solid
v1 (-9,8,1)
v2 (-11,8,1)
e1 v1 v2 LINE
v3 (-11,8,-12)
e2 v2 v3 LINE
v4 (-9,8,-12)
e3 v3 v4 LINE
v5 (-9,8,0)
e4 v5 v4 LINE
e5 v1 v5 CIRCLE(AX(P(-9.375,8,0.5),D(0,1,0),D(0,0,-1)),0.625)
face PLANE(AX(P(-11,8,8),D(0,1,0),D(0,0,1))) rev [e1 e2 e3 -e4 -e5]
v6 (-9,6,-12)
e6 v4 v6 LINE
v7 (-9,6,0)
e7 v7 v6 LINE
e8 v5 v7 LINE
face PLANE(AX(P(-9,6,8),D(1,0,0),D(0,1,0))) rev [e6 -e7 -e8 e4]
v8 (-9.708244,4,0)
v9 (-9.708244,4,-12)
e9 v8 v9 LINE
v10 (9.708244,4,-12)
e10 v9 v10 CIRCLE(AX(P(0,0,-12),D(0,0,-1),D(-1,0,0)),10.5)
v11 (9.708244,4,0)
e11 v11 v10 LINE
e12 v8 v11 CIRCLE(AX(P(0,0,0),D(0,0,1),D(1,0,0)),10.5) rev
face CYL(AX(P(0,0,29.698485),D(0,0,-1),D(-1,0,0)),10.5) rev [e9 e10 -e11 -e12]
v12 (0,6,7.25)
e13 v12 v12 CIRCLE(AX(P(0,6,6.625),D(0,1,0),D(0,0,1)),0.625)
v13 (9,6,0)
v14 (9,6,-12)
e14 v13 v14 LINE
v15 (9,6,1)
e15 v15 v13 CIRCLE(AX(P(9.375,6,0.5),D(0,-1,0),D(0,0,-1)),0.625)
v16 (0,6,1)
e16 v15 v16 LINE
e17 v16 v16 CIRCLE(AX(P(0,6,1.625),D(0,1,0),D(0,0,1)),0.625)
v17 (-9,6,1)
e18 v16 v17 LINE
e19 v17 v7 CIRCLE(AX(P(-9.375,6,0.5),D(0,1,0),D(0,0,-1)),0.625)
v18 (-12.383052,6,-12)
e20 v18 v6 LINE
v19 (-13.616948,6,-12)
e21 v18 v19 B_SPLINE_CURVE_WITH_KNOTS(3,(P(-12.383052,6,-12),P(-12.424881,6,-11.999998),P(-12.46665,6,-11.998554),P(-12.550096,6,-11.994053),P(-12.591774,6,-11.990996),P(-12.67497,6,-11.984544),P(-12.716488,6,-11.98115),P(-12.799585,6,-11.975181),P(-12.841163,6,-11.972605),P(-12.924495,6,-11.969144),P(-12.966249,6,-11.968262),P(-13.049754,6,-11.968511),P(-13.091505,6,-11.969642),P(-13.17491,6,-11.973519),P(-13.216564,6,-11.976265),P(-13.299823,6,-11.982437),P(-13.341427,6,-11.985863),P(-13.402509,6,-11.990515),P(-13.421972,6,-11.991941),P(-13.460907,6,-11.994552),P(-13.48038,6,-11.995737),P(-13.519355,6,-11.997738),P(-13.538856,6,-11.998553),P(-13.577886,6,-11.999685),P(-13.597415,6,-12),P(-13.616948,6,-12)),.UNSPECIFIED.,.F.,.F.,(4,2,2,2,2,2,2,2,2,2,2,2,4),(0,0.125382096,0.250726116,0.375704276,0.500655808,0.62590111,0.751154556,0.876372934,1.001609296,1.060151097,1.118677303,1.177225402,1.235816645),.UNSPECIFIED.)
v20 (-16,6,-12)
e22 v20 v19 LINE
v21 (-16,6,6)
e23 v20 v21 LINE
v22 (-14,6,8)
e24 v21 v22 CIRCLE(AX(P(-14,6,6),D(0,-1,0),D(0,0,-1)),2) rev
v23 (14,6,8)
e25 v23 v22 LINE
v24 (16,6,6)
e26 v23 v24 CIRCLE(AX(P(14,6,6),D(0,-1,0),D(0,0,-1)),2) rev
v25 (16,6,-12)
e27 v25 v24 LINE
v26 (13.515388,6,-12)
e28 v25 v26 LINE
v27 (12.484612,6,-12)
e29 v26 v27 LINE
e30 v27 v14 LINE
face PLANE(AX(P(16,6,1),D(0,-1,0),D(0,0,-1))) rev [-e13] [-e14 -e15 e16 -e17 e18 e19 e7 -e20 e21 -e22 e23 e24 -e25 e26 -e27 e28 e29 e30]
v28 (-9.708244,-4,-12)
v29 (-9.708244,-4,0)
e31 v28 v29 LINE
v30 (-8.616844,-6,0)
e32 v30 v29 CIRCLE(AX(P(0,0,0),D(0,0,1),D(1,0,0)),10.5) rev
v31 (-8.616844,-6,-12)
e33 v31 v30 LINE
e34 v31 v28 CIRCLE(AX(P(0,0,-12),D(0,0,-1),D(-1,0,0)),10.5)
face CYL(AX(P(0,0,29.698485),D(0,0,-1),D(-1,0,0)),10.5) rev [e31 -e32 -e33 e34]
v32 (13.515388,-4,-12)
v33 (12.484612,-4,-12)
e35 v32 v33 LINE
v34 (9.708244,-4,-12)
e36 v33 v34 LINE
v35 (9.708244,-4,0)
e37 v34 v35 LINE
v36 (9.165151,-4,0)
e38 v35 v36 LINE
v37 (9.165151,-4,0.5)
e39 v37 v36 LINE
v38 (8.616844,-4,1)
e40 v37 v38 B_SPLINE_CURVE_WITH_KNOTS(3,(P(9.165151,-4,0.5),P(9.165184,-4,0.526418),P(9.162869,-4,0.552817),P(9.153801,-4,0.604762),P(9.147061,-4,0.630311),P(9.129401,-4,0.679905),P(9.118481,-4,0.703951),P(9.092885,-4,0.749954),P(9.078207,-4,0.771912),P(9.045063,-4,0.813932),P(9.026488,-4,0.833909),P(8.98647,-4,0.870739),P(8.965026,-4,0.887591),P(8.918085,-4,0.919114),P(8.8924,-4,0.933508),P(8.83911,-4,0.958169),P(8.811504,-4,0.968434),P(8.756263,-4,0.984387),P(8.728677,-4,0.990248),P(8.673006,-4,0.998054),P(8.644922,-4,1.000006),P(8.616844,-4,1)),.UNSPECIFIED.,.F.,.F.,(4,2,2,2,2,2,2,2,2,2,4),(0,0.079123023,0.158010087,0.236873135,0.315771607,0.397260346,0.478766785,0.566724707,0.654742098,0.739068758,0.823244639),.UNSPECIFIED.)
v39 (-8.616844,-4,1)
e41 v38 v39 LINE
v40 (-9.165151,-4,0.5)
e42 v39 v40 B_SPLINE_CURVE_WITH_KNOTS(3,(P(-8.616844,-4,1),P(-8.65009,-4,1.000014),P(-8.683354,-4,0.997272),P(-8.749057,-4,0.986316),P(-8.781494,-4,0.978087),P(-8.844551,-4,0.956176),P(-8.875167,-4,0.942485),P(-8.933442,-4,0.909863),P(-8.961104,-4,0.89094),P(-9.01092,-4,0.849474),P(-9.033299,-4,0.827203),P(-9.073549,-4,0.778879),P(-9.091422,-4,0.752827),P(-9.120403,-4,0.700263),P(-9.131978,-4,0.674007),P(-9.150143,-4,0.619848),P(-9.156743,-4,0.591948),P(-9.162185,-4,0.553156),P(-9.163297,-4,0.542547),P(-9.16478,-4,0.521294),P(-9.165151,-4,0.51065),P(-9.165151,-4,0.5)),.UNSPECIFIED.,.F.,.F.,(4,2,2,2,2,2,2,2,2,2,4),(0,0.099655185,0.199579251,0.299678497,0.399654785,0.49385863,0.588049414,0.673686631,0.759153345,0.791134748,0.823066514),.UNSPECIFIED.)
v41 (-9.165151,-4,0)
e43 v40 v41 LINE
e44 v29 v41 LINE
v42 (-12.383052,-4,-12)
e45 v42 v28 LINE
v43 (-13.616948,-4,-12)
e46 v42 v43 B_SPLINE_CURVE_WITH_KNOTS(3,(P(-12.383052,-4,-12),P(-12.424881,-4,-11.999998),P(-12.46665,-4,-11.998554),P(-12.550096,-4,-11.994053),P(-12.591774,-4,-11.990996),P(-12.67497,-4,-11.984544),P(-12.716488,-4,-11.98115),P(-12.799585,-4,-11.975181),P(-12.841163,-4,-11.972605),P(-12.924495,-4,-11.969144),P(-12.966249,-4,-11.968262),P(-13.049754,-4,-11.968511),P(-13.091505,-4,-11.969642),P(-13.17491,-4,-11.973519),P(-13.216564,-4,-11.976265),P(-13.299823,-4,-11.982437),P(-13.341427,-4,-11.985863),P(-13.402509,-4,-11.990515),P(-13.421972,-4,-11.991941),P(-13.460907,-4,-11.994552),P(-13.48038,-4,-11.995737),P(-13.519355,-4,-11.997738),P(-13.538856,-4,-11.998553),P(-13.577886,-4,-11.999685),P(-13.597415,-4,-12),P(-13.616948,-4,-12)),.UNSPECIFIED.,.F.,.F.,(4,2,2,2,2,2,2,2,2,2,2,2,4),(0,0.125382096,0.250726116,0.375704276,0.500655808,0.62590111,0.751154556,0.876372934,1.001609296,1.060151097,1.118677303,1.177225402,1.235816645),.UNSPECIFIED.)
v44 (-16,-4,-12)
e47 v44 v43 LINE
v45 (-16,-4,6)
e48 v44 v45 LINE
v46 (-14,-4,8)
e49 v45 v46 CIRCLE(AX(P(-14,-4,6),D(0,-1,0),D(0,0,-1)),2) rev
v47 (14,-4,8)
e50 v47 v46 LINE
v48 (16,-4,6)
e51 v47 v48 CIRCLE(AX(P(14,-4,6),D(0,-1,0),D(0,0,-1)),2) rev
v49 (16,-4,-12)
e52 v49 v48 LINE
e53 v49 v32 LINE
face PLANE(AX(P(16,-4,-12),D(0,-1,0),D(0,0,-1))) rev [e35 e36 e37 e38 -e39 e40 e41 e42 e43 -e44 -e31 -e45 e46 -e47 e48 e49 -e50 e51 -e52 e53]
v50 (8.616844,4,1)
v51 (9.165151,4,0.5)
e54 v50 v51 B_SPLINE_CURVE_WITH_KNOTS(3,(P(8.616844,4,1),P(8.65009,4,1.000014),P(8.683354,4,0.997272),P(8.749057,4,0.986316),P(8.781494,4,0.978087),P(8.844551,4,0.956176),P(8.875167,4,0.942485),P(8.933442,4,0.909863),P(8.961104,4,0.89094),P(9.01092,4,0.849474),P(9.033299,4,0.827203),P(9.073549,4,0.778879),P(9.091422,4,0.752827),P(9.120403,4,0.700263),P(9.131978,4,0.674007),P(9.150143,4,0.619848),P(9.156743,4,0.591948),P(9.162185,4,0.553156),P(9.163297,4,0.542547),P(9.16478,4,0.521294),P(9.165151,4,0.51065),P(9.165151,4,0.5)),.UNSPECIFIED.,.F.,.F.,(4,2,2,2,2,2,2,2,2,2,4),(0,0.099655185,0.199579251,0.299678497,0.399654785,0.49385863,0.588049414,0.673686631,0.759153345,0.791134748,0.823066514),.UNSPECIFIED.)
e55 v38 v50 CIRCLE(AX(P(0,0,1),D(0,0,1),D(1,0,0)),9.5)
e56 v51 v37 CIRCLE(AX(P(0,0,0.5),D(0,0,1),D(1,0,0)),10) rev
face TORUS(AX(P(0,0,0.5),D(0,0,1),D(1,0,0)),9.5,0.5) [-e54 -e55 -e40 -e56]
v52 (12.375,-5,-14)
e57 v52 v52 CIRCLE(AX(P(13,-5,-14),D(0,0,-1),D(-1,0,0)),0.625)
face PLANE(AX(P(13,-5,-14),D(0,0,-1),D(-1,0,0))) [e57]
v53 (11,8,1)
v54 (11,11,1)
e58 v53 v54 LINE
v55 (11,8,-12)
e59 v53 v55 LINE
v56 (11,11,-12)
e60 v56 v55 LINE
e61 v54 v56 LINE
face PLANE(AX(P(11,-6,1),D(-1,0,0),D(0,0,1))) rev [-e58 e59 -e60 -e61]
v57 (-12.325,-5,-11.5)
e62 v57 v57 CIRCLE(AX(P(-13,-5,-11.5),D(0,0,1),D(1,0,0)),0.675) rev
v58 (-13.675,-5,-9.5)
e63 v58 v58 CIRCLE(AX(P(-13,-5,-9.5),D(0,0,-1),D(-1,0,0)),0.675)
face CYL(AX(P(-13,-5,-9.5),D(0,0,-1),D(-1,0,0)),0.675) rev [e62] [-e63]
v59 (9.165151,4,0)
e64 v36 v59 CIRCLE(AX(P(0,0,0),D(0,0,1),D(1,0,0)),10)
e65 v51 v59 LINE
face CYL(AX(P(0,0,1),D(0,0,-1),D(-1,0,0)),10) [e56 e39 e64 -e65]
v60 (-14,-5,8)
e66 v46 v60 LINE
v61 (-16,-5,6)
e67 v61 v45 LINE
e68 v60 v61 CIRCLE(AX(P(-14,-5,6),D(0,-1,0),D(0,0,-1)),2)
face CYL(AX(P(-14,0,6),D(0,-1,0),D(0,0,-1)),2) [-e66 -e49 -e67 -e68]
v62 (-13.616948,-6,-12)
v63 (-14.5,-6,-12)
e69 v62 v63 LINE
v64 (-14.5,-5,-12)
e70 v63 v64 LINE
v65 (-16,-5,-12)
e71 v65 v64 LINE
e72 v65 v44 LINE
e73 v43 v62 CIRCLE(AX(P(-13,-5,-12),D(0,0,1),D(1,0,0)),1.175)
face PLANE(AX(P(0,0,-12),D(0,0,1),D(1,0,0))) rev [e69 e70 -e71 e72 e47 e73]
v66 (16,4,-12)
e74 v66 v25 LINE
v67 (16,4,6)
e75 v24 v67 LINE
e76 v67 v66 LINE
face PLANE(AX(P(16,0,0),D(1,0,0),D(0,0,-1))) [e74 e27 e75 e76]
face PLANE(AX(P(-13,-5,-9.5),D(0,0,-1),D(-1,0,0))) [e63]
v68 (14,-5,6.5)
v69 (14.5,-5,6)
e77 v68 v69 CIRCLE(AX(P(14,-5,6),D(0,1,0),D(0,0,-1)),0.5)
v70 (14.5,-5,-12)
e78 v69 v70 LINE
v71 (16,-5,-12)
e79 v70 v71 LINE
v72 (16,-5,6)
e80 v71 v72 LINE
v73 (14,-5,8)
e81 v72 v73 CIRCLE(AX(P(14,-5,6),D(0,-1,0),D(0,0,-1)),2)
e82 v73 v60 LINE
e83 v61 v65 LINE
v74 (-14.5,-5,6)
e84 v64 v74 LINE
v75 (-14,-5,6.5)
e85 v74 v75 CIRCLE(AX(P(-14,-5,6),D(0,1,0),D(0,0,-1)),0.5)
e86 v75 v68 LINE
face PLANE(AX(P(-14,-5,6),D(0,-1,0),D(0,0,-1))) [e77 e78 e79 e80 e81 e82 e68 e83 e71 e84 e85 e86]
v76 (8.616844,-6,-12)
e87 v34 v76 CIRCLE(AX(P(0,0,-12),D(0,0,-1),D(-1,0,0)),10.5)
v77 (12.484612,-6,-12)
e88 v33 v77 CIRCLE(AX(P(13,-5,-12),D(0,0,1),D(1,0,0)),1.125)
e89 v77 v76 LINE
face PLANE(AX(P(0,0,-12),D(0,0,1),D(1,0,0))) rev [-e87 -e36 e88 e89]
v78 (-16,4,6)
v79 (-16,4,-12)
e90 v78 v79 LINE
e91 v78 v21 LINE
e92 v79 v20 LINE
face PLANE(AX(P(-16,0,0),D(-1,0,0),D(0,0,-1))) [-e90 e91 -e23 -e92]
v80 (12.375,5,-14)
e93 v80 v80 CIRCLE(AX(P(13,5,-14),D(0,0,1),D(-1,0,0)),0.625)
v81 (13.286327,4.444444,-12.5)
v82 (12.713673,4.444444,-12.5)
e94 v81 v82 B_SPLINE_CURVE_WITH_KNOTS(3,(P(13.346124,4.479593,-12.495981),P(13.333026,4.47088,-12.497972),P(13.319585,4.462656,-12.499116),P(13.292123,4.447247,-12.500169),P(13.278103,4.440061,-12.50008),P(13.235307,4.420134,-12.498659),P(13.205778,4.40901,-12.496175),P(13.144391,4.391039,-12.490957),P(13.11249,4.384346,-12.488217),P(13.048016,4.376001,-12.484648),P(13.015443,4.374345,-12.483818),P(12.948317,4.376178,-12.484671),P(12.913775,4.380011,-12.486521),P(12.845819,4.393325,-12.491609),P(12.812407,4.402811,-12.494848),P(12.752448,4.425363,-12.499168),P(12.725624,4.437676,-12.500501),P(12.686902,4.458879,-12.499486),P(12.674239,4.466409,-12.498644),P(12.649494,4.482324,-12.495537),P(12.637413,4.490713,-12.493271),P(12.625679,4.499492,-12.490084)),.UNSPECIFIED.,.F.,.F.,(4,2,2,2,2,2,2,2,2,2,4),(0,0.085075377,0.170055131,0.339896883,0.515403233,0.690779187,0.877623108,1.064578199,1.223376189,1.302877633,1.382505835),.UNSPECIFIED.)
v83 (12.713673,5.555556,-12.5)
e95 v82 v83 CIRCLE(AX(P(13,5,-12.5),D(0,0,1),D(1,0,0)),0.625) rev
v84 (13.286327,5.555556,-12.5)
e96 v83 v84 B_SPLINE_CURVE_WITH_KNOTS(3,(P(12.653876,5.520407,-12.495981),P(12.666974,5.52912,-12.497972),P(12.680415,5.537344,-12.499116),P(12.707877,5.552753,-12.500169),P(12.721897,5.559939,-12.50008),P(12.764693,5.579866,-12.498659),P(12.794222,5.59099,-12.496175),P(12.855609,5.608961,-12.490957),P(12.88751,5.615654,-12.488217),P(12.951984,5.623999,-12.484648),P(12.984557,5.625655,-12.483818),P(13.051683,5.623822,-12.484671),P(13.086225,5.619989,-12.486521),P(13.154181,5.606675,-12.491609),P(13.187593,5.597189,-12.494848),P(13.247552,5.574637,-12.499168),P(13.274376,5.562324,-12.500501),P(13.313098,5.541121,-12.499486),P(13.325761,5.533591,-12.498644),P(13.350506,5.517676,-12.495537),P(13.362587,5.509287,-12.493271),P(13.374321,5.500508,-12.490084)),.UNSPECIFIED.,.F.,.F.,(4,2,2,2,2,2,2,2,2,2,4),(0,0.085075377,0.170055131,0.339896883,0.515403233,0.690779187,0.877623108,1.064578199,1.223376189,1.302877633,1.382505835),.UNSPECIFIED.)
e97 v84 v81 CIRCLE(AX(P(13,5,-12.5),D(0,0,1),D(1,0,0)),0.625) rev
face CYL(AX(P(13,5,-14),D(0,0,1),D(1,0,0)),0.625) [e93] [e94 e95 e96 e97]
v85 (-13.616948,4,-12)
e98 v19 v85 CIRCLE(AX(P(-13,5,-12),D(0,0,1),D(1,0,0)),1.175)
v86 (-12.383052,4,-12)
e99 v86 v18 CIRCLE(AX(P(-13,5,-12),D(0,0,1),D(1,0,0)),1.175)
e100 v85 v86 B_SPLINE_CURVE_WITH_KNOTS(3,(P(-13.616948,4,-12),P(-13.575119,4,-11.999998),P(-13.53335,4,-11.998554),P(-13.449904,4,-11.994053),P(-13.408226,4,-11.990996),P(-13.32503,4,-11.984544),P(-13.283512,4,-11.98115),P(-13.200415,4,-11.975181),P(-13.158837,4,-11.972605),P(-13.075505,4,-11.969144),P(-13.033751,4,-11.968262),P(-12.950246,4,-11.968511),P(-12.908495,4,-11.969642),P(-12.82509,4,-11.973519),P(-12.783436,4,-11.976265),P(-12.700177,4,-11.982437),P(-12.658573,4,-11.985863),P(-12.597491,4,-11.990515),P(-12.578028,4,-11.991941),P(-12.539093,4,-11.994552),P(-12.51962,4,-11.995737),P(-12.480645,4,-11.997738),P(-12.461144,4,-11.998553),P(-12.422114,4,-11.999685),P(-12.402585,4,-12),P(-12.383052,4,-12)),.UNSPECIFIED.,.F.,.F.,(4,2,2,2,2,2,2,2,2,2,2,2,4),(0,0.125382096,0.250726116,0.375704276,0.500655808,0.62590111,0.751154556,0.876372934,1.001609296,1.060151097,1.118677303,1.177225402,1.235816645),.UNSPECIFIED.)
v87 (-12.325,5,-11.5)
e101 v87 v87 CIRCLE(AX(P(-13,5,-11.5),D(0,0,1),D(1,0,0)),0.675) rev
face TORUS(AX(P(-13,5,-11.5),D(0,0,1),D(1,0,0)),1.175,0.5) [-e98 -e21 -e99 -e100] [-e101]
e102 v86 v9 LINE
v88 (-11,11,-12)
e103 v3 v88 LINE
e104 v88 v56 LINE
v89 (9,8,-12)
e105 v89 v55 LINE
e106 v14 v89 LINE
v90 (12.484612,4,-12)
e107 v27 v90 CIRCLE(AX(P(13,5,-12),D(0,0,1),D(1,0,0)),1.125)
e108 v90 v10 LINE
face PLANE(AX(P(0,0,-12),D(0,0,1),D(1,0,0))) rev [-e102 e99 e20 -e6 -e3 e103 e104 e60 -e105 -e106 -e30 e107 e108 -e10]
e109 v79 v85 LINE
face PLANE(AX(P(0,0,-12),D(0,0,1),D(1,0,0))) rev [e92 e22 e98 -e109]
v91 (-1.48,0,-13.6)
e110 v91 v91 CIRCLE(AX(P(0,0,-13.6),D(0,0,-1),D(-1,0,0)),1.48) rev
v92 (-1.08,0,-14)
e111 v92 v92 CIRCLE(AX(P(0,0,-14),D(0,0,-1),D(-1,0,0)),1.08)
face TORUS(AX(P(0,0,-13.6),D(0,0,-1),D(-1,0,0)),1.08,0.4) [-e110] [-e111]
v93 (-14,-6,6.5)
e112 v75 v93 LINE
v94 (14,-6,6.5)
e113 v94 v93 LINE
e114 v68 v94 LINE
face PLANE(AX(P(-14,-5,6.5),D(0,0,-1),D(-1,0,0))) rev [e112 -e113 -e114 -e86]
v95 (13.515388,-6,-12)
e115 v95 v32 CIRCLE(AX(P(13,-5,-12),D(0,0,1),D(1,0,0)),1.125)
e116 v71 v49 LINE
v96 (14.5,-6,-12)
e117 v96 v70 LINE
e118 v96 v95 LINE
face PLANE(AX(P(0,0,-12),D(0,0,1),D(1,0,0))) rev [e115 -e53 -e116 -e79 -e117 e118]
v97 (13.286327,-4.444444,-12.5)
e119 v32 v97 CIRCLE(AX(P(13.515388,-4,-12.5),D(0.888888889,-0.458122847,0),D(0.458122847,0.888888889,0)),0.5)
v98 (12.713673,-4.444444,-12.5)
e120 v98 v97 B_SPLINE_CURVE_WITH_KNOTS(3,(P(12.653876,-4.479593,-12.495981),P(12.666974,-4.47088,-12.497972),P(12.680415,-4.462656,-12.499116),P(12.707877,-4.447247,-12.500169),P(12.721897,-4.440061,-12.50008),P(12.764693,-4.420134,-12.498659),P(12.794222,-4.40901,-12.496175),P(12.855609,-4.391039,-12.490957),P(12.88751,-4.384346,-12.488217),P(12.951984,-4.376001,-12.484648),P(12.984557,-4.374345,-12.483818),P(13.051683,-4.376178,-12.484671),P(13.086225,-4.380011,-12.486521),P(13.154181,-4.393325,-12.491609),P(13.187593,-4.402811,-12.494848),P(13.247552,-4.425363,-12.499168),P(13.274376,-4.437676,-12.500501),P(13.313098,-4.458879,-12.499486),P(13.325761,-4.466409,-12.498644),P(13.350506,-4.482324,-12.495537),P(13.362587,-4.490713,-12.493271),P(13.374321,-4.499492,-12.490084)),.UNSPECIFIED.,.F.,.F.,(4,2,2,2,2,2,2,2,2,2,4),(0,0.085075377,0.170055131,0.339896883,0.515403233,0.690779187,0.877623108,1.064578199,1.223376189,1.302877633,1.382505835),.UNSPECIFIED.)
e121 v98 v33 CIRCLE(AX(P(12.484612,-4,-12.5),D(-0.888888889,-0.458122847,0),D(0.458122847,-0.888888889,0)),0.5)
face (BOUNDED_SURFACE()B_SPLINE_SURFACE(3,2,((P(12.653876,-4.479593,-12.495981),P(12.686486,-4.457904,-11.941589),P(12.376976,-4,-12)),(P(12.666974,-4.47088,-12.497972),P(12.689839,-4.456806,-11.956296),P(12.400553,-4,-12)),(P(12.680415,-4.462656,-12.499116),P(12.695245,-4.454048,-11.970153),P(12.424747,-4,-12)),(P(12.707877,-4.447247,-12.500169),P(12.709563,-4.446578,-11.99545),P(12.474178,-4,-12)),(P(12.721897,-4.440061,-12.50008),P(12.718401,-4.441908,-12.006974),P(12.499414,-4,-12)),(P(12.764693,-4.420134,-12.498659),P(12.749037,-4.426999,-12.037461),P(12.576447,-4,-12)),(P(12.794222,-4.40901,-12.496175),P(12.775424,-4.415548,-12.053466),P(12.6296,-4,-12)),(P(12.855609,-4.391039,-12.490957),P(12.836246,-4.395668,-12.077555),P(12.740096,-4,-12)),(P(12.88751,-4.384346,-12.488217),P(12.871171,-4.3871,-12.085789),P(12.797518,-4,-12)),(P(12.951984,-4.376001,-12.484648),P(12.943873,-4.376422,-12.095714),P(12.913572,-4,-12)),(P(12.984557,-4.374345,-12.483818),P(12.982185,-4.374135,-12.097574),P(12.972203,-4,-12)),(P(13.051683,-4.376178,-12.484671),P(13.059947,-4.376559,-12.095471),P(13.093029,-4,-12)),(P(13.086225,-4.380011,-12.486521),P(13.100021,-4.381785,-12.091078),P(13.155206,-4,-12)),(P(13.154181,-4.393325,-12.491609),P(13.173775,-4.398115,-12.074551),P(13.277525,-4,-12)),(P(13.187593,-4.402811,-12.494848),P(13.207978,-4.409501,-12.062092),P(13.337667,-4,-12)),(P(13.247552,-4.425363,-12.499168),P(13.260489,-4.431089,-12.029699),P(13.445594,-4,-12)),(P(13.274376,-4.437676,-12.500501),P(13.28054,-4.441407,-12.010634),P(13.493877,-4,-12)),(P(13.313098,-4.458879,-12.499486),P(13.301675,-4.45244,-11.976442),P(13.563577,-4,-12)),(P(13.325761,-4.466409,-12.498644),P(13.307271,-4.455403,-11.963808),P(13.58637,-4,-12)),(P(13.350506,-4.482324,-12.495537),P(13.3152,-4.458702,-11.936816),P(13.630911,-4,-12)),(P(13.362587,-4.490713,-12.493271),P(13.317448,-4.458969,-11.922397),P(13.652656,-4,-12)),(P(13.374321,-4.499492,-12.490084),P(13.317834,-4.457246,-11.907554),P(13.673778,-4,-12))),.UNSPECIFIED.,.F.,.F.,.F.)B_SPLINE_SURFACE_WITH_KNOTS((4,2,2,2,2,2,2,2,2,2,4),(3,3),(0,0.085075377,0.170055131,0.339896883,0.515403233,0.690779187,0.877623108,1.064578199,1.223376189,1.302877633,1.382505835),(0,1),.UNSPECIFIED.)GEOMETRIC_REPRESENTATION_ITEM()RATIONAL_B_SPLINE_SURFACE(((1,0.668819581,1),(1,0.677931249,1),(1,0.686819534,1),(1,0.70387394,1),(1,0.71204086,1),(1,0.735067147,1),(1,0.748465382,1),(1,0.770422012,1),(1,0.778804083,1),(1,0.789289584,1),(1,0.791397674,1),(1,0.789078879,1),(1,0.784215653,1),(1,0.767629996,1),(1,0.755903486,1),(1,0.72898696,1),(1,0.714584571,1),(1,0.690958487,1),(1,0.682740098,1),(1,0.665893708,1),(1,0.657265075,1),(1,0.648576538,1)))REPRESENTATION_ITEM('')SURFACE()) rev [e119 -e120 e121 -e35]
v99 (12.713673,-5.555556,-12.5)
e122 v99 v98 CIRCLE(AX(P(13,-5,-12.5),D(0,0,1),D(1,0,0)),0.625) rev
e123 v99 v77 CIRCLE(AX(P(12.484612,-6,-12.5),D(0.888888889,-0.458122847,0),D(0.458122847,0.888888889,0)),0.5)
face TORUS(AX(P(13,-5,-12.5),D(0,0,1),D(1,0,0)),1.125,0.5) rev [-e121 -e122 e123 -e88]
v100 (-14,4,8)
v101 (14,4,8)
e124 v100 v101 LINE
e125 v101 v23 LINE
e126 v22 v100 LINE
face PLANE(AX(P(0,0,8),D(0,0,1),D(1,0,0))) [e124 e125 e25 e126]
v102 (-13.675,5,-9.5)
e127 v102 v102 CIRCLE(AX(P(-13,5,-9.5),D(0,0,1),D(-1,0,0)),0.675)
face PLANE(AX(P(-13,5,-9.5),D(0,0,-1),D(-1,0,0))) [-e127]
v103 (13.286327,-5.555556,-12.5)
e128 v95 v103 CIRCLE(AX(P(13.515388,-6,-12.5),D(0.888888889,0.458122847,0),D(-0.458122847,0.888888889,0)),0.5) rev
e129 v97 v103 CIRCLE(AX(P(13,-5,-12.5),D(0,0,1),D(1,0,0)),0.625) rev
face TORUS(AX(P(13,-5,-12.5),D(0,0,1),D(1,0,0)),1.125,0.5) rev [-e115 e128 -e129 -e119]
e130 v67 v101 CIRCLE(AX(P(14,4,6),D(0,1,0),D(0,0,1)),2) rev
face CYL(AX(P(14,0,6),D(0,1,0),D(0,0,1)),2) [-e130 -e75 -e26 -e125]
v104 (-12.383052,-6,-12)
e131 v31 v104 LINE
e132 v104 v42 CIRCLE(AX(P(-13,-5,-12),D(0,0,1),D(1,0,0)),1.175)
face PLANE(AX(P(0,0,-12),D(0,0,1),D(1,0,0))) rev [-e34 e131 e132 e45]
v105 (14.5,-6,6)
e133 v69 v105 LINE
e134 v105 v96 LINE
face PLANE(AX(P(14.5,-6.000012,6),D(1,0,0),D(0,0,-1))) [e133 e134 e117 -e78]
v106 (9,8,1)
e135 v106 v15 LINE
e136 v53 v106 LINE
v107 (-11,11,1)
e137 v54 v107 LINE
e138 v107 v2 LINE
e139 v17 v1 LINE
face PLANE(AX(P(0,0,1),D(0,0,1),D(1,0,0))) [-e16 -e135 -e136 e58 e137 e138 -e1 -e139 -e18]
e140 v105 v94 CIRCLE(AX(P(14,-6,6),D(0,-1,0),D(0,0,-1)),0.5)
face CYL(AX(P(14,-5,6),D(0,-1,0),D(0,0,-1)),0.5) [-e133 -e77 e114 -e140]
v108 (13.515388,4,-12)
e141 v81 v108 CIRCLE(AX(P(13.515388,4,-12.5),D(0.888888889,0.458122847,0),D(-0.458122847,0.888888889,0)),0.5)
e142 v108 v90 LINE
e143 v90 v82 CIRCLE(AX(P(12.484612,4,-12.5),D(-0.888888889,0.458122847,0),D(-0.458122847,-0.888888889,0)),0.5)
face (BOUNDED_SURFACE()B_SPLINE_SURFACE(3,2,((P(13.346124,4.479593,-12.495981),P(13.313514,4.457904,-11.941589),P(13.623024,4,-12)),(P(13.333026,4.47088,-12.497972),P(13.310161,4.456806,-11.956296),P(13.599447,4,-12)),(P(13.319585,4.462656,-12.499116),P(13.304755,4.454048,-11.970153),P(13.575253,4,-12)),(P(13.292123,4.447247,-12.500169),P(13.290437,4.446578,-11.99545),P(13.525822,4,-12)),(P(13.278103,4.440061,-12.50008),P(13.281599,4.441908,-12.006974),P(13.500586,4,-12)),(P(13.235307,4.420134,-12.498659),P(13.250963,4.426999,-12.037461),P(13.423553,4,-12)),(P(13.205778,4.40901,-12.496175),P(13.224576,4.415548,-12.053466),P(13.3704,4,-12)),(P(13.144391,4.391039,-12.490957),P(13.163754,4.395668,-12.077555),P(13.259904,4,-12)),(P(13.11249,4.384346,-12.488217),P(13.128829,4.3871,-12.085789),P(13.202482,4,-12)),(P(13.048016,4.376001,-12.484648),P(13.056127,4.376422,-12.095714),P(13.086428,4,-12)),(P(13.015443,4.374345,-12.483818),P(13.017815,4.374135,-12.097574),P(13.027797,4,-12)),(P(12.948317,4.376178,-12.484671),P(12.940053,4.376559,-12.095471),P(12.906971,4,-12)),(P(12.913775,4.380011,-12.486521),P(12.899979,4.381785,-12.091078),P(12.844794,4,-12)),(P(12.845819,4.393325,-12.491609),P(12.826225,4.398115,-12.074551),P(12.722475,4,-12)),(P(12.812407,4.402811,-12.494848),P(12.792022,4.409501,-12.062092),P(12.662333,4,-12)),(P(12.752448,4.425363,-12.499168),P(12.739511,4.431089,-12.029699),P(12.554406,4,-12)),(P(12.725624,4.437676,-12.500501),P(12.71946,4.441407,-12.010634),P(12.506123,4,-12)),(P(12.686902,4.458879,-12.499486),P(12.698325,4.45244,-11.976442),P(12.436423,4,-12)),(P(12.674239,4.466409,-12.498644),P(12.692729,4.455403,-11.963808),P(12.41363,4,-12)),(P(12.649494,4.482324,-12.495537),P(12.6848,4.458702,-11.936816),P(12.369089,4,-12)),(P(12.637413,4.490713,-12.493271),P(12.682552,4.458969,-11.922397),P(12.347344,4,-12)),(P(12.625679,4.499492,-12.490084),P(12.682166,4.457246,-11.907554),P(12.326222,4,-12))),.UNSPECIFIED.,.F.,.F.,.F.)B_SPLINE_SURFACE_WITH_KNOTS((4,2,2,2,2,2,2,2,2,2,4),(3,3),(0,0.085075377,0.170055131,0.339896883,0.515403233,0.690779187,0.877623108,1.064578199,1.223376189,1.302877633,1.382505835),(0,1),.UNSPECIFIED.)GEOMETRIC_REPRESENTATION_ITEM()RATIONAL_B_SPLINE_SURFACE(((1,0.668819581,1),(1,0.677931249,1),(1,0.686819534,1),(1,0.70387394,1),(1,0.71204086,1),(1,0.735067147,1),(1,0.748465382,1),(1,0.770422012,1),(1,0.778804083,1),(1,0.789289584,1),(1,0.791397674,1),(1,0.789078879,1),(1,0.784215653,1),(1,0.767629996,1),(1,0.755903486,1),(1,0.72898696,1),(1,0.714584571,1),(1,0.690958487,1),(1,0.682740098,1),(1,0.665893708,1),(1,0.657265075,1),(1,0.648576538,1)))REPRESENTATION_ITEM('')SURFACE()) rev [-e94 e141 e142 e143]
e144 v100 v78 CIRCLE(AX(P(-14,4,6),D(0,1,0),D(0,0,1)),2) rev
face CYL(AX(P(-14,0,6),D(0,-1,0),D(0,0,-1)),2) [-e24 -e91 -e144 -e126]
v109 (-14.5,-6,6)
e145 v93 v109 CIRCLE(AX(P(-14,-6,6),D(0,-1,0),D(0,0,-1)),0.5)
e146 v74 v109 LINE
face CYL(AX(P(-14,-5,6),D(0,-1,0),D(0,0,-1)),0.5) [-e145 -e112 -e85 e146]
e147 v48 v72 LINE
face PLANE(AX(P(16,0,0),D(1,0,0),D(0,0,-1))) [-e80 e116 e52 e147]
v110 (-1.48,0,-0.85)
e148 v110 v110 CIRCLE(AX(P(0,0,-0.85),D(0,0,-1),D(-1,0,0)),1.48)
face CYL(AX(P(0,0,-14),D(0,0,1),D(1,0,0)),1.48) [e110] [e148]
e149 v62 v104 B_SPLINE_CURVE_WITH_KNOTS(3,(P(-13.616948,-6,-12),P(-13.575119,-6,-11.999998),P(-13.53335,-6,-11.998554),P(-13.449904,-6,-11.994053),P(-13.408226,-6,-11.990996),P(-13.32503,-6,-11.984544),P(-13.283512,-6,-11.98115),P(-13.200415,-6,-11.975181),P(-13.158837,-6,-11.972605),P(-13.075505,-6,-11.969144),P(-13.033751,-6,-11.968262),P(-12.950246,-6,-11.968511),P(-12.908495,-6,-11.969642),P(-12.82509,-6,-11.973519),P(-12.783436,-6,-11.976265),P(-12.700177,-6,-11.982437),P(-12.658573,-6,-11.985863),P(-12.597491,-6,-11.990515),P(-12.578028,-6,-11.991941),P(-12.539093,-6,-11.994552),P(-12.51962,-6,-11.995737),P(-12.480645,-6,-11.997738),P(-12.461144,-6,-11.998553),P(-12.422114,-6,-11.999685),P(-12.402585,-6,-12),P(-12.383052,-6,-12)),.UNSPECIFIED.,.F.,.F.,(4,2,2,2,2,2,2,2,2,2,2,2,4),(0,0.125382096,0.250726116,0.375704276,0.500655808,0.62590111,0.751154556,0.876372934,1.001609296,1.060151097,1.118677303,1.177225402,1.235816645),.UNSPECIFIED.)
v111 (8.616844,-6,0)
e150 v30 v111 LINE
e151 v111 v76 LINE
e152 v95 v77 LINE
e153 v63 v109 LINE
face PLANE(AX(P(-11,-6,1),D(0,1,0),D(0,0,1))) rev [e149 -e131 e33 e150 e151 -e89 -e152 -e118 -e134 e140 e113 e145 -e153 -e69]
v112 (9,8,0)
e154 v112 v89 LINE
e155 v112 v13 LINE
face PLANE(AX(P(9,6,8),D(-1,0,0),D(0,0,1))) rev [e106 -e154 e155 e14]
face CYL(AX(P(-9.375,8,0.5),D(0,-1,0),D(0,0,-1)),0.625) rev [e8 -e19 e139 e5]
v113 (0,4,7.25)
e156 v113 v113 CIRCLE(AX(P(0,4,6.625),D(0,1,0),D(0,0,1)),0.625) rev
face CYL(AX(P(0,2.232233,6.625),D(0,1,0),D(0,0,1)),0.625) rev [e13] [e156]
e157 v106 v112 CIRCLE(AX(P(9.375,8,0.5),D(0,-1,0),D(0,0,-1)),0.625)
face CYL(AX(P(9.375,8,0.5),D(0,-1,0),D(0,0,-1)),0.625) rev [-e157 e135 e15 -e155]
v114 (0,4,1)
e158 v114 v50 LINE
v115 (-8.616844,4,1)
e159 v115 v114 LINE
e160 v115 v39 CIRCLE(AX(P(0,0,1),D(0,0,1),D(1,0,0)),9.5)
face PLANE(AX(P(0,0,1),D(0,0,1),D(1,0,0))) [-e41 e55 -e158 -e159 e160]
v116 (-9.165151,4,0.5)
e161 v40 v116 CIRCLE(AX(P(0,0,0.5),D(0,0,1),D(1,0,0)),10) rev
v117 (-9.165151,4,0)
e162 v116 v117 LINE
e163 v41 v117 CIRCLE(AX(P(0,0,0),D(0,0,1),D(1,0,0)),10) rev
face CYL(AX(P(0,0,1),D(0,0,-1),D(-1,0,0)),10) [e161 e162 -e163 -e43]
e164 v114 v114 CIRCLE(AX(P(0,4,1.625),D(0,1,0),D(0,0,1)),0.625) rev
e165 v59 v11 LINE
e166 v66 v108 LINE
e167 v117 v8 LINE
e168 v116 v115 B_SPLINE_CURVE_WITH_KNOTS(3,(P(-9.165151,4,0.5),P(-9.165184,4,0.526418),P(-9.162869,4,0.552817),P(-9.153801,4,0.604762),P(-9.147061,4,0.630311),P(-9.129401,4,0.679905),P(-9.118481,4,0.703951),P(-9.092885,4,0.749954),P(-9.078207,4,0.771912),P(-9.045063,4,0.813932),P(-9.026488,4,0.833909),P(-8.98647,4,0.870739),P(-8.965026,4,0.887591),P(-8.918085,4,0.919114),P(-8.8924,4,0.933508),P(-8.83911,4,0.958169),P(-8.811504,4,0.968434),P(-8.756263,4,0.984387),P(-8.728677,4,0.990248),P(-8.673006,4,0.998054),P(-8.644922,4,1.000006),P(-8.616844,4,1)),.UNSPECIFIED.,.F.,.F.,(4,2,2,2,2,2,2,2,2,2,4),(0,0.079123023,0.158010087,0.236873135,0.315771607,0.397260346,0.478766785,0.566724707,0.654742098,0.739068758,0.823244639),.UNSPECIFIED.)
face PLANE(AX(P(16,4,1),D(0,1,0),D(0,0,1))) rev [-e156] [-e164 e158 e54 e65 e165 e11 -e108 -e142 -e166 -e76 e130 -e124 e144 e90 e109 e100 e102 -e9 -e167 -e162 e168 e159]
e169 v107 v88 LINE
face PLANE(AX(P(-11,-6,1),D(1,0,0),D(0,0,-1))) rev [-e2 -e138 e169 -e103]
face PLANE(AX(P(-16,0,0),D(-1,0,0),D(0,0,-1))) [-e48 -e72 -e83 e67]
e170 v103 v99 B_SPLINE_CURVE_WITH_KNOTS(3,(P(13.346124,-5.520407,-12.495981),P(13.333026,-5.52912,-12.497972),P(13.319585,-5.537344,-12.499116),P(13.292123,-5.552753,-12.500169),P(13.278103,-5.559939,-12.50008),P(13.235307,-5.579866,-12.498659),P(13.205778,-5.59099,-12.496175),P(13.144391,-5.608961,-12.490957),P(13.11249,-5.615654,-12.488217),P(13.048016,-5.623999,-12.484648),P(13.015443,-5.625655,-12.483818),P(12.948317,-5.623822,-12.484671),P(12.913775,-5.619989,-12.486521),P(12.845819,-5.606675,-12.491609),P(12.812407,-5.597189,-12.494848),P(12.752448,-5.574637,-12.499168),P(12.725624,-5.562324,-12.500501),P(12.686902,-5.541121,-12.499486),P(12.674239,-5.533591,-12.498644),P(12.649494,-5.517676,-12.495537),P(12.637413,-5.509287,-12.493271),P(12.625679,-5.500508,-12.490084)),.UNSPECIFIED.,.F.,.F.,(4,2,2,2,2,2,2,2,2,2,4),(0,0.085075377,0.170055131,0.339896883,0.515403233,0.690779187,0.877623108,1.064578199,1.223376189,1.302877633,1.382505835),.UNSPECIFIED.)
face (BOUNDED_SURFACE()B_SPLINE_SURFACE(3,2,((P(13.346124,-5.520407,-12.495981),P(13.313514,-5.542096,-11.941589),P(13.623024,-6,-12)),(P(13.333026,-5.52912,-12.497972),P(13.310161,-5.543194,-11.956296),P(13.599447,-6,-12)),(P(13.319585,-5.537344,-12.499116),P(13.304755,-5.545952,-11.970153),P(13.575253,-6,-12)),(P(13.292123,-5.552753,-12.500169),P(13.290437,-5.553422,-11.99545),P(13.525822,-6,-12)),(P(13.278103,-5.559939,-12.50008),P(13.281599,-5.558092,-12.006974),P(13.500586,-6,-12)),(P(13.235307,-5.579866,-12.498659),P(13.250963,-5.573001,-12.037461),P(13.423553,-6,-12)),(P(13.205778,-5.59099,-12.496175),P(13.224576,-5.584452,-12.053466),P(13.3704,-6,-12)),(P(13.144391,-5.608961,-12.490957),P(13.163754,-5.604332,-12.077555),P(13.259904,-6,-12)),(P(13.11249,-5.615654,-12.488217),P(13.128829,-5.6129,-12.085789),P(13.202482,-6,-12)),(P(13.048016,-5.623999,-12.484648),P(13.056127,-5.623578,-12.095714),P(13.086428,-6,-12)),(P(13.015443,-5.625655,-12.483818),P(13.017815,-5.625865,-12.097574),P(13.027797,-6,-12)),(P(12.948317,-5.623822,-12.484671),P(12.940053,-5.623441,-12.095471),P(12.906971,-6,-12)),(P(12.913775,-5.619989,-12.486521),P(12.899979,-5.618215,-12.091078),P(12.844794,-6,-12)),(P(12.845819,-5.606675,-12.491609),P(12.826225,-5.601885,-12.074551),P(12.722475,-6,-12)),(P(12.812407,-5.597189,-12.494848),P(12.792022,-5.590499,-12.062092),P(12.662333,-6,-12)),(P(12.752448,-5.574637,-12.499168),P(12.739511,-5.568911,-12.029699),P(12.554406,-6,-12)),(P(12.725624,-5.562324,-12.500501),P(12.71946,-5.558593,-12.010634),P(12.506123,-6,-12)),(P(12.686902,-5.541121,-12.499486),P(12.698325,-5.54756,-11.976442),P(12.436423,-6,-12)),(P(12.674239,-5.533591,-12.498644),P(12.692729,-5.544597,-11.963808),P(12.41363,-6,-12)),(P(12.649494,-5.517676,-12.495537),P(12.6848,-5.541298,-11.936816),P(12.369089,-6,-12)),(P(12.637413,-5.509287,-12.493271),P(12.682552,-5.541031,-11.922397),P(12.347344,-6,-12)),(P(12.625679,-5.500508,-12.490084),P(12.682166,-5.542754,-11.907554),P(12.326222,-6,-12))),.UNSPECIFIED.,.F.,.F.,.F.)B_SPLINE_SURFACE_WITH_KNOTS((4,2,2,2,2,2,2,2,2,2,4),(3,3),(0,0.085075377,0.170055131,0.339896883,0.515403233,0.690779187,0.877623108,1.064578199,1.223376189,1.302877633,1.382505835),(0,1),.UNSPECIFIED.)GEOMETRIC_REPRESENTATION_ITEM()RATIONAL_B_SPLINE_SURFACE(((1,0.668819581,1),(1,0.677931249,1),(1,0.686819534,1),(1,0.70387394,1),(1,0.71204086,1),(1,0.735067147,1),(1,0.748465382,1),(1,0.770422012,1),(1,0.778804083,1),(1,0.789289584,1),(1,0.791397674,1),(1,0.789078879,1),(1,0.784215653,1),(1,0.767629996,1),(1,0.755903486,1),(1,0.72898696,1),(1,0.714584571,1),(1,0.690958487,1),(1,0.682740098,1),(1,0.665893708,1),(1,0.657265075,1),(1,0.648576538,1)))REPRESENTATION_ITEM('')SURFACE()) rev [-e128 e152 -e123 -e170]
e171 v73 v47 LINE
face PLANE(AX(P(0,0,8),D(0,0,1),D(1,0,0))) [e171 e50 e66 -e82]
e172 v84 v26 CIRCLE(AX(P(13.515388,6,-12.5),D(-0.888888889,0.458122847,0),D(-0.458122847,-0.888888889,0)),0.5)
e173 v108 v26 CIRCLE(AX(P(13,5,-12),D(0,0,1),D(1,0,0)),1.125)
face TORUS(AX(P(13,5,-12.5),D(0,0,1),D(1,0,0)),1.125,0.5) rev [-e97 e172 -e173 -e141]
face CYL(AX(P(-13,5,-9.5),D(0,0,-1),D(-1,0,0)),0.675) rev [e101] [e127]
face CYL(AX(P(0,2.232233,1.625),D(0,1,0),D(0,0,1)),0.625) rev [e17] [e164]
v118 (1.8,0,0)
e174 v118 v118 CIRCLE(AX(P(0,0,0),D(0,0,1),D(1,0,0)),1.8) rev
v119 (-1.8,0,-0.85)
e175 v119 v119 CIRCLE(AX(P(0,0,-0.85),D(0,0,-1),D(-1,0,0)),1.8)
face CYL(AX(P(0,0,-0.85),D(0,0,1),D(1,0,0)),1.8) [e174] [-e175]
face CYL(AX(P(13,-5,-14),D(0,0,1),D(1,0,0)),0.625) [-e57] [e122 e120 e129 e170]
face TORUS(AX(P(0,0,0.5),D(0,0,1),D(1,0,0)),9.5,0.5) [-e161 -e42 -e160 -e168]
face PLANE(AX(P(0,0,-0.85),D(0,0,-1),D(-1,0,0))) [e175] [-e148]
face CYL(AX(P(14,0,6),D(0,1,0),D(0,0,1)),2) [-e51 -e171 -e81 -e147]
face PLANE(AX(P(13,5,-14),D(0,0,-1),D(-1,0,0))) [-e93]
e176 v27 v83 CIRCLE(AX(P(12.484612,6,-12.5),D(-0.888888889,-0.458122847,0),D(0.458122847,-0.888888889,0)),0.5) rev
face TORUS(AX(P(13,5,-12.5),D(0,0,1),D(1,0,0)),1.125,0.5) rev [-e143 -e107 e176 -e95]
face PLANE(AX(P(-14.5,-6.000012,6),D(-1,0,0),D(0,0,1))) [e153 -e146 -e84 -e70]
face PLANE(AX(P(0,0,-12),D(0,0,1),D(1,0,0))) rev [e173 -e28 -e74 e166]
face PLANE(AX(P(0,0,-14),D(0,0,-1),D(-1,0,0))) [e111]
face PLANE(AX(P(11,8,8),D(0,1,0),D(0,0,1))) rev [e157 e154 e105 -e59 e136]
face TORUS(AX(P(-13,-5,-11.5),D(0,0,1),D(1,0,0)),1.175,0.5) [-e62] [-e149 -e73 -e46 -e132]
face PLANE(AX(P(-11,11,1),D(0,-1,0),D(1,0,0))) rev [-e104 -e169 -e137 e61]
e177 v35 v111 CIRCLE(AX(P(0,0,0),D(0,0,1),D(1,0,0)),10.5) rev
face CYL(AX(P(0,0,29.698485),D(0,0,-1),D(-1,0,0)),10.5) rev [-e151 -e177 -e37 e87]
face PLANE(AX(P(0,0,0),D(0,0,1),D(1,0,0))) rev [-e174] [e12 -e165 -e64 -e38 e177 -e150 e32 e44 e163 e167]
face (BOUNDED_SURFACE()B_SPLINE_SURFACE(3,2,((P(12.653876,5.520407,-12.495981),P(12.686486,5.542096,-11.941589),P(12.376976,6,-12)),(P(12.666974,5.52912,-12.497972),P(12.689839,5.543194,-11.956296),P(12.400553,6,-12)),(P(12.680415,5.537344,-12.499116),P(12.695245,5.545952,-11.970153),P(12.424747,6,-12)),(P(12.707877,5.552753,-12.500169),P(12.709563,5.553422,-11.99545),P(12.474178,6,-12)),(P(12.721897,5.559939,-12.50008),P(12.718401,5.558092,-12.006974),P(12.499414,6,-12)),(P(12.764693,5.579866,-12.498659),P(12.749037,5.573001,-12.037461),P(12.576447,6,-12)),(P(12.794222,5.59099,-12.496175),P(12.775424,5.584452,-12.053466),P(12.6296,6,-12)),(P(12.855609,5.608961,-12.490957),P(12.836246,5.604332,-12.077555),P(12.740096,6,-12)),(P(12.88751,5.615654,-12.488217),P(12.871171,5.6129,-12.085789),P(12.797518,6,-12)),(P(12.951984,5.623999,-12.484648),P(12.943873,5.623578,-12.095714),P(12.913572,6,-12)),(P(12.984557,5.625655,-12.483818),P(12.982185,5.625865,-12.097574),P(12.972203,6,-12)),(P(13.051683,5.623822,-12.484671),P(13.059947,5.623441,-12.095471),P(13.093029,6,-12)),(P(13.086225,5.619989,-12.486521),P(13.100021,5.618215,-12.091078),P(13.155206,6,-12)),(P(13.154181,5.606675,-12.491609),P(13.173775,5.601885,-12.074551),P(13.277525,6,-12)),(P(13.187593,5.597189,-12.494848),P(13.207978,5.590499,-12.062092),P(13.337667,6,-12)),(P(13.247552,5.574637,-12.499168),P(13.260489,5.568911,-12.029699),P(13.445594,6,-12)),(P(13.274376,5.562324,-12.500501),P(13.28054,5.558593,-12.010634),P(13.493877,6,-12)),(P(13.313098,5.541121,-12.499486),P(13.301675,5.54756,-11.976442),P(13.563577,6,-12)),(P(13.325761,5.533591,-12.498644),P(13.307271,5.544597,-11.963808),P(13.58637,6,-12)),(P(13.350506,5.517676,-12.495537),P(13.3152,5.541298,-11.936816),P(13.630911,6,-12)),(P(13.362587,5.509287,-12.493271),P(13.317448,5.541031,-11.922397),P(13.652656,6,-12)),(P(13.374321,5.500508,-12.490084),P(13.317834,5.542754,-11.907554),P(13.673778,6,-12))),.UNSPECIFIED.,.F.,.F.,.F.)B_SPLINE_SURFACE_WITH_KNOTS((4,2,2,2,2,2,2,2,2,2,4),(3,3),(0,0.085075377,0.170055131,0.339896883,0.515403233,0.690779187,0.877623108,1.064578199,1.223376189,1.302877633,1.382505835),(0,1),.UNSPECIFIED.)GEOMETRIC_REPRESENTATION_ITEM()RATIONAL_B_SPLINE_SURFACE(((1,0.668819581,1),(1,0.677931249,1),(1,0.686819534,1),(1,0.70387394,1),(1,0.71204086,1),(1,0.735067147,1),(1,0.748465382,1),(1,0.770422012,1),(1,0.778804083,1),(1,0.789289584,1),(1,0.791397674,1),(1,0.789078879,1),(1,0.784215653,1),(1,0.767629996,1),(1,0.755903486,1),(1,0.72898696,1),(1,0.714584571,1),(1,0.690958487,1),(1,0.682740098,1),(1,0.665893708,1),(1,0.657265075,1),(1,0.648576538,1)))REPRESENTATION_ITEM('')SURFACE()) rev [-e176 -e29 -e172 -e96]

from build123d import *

# Parameters (mm, degrees)
BOSS_EXTRUDE1_DEPTH     = 1
SKETCH2_R               = 1.48
BOSS_EXTRUDE2_DEPTH     = 14
SKETCH3_R               = 1.8
BOSS_EXTRUDE3_DEPTH     = 0.85
SKETCH4_W               = 2
SKETCH4_H               = 17
BOSS_EXTRUDE4_DEPTH     = 12
SKETCH5_W               = 18
SKETCH5_H               = 2
BOSS_EXTRUDE5_DEPTH     = 12
SKETCH6_W               = 13
SKETCH6_H               = 2
BOSS_EXTRUDE6_DEPTH     = 5
BOSS_EXTRUDE7_DEPTH     = 12
CUT_EXTRUDE1_DEPTH      = 24.366642891
SKETCH9_W               = 2.937742252
SKETCH9_H               = 8
CUT_EXTRUDE2_DEPTH      = 12
CUT_EXTRUDE11_START     = -12
SKETCH21_R              = 10.5
SKETCH21_R_2            = 1.8
CUT_EXTRUDE11_DEPTH     = 12
SKETCH10_W              = 32
SKETCH10_H              = 2
BOSS_EXTRUDE8_DEPTH     = 7
FILLET1_R               = 0.5
SKETCH11_R              = 0.625
BOSS_EXTRUDE9_DEPTH     = 2
SKETCH14_W              = 2
SKETCH14_H              = 2
CUT_EXTRUDE5_DEPTH      = 28.874719859
SKETCH12_R              = 0.675
CUT_EXTRUDE3_DEPTH      = 2.5
CUT_EXTRUDE6_DEPTH      = 2
FILLET2_R               = 0.5
FILLET3_R               = 0.5
FILLET4_R               = 2
CUT_EXTRUDE7_DEPTH      = 28.221315288
CUT_EXTRUDE7_DEPTH_BACK = 1
SKETCH19_R              = 0.625
CUT_EXTRUDE9_DEPTH      = 2
FILLET5_R               = 0.4


with BuildPart() as part:
    # Sketch1 → Boss-Extrude1 (new body)
    with BuildSketch(Plane.XY):
        Polygon((-11, 6), (-11, 11), (11, 11), (11, 6), (11, -6), (-11, -6), align=None)
    extrude(amount=BOSS_EXTRUDE1_DEPTH)

    # Sketch2 → Boss-Extrude2 (add)
    with BuildSketch(Plane(origin=(0, 0, 0), x_dir=(-1, 0, 0), z_dir=(0, 0, -1))):
        with Locations(Location((0, 0, 0), (0, 0, 180))):
            Circle(SKETCH2_R)
    extrude(amount=BOSS_EXTRUDE2_DEPTH)

    # Sketch3 → Boss-Extrude3 (add)
    with BuildSketch(Plane(origin=(0, 0, 0), x_dir=(-1, 0, 0), z_dir=(0, 0, -1))):
        with Locations(Location((0, 0, 0), (0, 0, 180))):
            Circle(SKETCH3_R)
    extrude(amount=BOSS_EXTRUDE3_DEPTH)

    # Sketch4 → Boss-Extrude4 (add)
    with BuildSketch(Plane(origin=(0, 0, 0), x_dir=(-1, 0, 0), z_dir=(0, 0, -1))):
        with Locations((10, 2.5)):
            Rectangle(SKETCH4_W, SKETCH4_H)
        with Locations((-10, 2.5)):
            Rectangle(SKETCH4_W, SKETCH4_H)
    extrude(amount=BOSS_EXTRUDE4_DEPTH)

    # Sketch5 → Boss-Extrude5 (add)
    with BuildSketch(Plane(origin=(0, 0, 0), x_dir=(-1, 0, 0), z_dir=(0, 0, -1))):
        with Locations((0, 10)):
            Rectangle(SKETCH5_W, SKETCH5_H)
    extrude(amount=BOSS_EXTRUDE5_DEPTH)

    # Sketch6 → Boss-Extrude6 (add)
    with BuildSketch(Plane(origin=(11, 0, 0), x_dir=(0, 0, -1), z_dir=(1, 0, 0))):
        with Locations((5.5, -5)):
            Rectangle(SKETCH6_W, SKETCH6_H)
        with Locations((5.5, 5)):
            Rectangle(SKETCH6_W, SKETCH6_H)
    boss_extrude6 = extrude(amount=BOSS_EXTRUDE6_DEPTH)

    # Mirror1: Boss-Extrude6 across plane
    add(boss_extrude6.mirror(Plane(origin=(0, 0, 0), x_dir=(0, 0, 1), z_dir=(1, 0, 0))))

    # Sketch7 → Boss-Extrude7 (add)
    with BuildSketch(Plane(origin=(0, 0, -12), x_dir=(-1, 0, 0), z_dir=(0, 0, -1))):
        with BuildLine():
            ThreePointArc((-6.708203932, -6), (-8.407551231, -3.211398808), (-9, 0))
            Line((-9, 0), (-9, -6))
            Line((-9, -6), (-6.708203932, -6))
        make_face()
        with BuildLine():
            Line((-9, 9), (-9, 0))
            ThreePointArc((-9, 0), (-6.363961031, 6.363961031), (0, 9))
            Line((0, 9), (-9, 9))
        make_face()
    boss_extrude7 = extrude(amount=-BOSS_EXTRUDE7_DEPTH)

    # Sketch8 → Cut-Extrude1 (cut, through all)
    with BuildSketch(Plane(origin=(0, 0, -12), x_dir=(-1, 0, 0), z_dir=(0, 0, -1))):
        with BuildLine():
            Line((-11, 4), (-9.16515139, 4))
            ThreePointArc((-9.16515139, 4), (-10, 0), (-9.16515139, -4))
            Line((-9.16515139, -4), (-11, -4))
            Line((-11, -4), (-11, 4))
        make_face()
    cut_extrude1 = extrude(amount=-CUT_EXTRUDE1_DEPTH, mode=Mode.SUBTRACT)

    # Sketch9 → Cut-Extrude2 (cut)
    with BuildSketch(Plane(origin=(0, 0, -12), x_dir=(-1, 0, 0), z_dir=(0, 0, -1))):
        with Locations((-9.531128874, 0)):
            Rectangle(SKETCH9_W, SKETCH9_H)
    cut_extrude2 = extrude(amount=-CUT_EXTRUDE2_DEPTH, mode=Mode.SUBTRACT)

    # Mirror2: Boss-Extrude7, Cut-Extrude1, Cut-Extrude2 across plane
    add(boss_extrude7.mirror(Plane(origin=(0, 0, 0), x_dir=(0, 0, 1), z_dir=(1, 0, 0))))
    add(cut_extrude1.mirror(Plane(origin=(0, 0, 0), x_dir=(0, 0, 1), z_dir=(1, 0, 0))), mode=Mode.SUBTRACT)
    add(cut_extrude2.mirror(Plane(origin=(0, 0, 0), x_dir=(0, 0, 1), z_dir=(1, 0, 0))), mode=Mode.SUBTRACT)

    # Sketch21 → Cut-Extrude11 (cut)
    with BuildSketch(Plane(origin=(0, 0, -12), x_dir=(-1, 0, 0), z_dir=(0, 0, -1)).offset(CUT_EXTRUDE11_START)):
        Circle(SKETCH21_R)
        with Locations(Location((0, 0, 0), (0, 0, 180))):
            Circle(SKETCH21_R_2, mode=Mode.SUBTRACT)
    extrude(amount=CUT_EXTRUDE11_DEPTH, mode=Mode.SUBTRACT)

    # Sketch10 → Boss-Extrude8 (add)
    with BuildSketch(Plane.XY.offset(1)):
        with Locations((0, -5)):
            Rectangle(SKETCH10_W, SKETCH10_H)
        with Locations((0, 5)):
            Rectangle(SKETCH10_W, SKETCH10_H)
    extrude(amount=BOSS_EXTRUDE8_DEPTH)

    # Fillet1
    fillet1_edges = [part.edges().sort_by_distance(p)[0] for p in [
        (10, 0, 1),
        (-10, 0, 1),
    ]]
    fillet(fillet1_edges, radius=FILLET1_R)

    # Sketch11 → Boss-Extrude9 (add)
    with BuildSketch(Plane(origin=(0, 0, -12), x_dir=(-1, 0, 0), z_dir=(0, 0, -1))):
        with Locations(Location((-13, -5, 0), (0, 0, 180))):
            Circle(SKETCH11_R)
    boss_extrude9 = extrude(amount=BOSS_EXTRUDE9_DEPTH)

    # Sketch14 → Cut-Extrude5 (cut, through all)
    with BuildSketch(Plane(origin=(0, 0, -12), x_dir=(-1, 0, 0), z_dir=(0, 0, -1))):
        with Locations((10, 7)):
            Rectangle(SKETCH14_W, SKETCH14_H)
        with Locations((-10, 7)):
            Rectangle(SKETCH14_W, SKETCH14_H)
    extrude(amount=-CUT_EXTRUDE5_DEPTH, mode=Mode.SUBTRACT)

    # Sketch12 → Cut-Extrude3 (cut)
    with BuildSketch(Plane(origin=(0, 0, -12), x_dir=(-1, 0, 0), z_dir=(0, 0, -1))):
        with Locations((13, -5)):
            Circle(SKETCH12_R)
    cut_extrude3 = extrude(amount=-CUT_EXTRUDE3_DEPTH, mode=Mode.SUBTRACT)

    # Sketch16 → Cut-Extrude6 (cut)
    with BuildSketch(Plane(origin=(0, 6, 0), x_dir=(1, 0, 0), z_dir=(0, 1, 0))):
        with BuildLine():
            Line((-9, 0), (-9, -1))
            ThreePointArc((-9, -1), (-8.75, -0.5), (-9, 0))
        make_face()
    cut_extrude6 = extrude(amount=CUT_EXTRUDE6_DEPTH, mode=Mode.SUBTRACT)

    # Mirror3: Boss-Extrude9, Cut-Extrude3 across plane
    add(boss_extrude9.mirror(Plane.ZX))
    add(cut_extrude3.mirror(Plane.ZX), mode=Mode.SUBTRACT)

    # Mirror4: Cut-Extrude6 across plane
    add(cut_extrude6.mirror(Plane(origin=(0, 0, 0), x_dir=(0, 0, 1), z_dir=(1, 0, 0))), mode=Mode.SUBTRACT)

    # Fillet2
    fillet2_edges = [part.edges().sort_by_distance(p)[0] for p in [
        (12.375, -5, -12),
        (12.375, 5, -12),
    ]]
    fillet(fillet2_edges, radius=FILLET2_R)

    # Fillet3
    # the kernel refuses this fillet: 0.5 mm, written as the material it takes off along each edge
    with BuildSketch(Plane(origin=(-13, -5, -12), x_dir=(-1, 0, 0), z_dir=(0, -1, 0))) as fillet3_piece_1:
        with BuildLine():
            CenterArc((0.675 + FILLET3_R, -FILLET3_R), FILLET3_R, 90, 90)
            Line((0.675, -FILLET3_R), (0.675, 0))
            Line((0.675, 0), (0.675 + FILLET3_R, 0))
        make_face()
    revolve(axis=Axis((-13, -5, -12), (0, 0, -1)), mode=Mode.SUBTRACT)
    with BuildSketch(Plane(origin=(-13, 5, -12), x_dir=(-1, 0, 0), z_dir=(0, 1, 0))) as fillet3_piece_2:
        with BuildLine():
            CenterArc((0.675 + FILLET3_R, FILLET3_R), FILLET3_R, 180, 90)
            Line((0.675, FILLET3_R), (0.675, 0))
            Line((0.675, 0), (0.675 + FILLET3_R, 0))
        make_face()
    revolve(axis=Axis((-13, 5, -12), (0, 0, 1)), mode=Mode.SUBTRACT)

    # Fillet4
    fillet4_edges = [part.edges().sort_by_distance(p)[0] for p in [
        (16, -5, 8),
        (-16, -5, 8),
        (-16, 5, 8),
        (16, 5, 8),
    ]]
    fillet(fillet4_edges, radius=FILLET4_R)

    # Sketch17 → Cut-Extrude7 (cut, two sides: drawn at the far end of the back side and taken through both)
    with BuildSketch(Plane.XZ.offset(6).offset(-CUT_EXTRUDE7_DEPTH_BACK)):
        with BuildLine():
            Line((-16, 6), (-16, -12))
            Line((-16, -12), (-14.5, -12))
            Line((-14.5, -12), (-14.5, 6))
            ThreePointArc((-14.5, 6), (-14.353553391, 6.353553391), (-14, 6.5))
            Line((-14, 6.5), (14, 6.5))
            ThreePointArc((14, 6.5), (14.353553391, 6.353553391), (14.5, 6))
            Line((14.5, 6), (14.5, -12))
            Line((14.5, -12), (16, -12))
            Line((16, -12), (16, 6))
            ThreePointArc((16, 6), (15.414213562, 7.414213562), (14, 8))
            Line((14, 8), (-14, 8))
            ThreePointArc((-14, 8), (-15.414213562, 7.414213562), (-16, 6))
        make_face()
    extrude(amount=CUT_EXTRUDE7_DEPTH + CUT_EXTRUDE7_DEPTH_BACK, mode=Mode.SUBTRACT)

    # Sketch19 → Cut-Extrude9 (cut)
    with BuildSketch(Plane(origin=(0, 6, 0), x_dir=(1, 0, 0), z_dir=(0, 1, 0))):
        with Locations(Location((0, -1.625, 0), (0, 0, 90))):
            Circle(SKETCH19_R)
        with Locations(Location((0, -6.625, 0), (0, 0, 270))):
            Circle(SKETCH19_R)
    extrude(amount=-CUT_EXTRUDE9_DEPTH, mode=Mode.SUBTRACT)

    # Fillet5
    fillet5_edges = [part.edges().sort_by_distance(p)[0] for p in [
        (-1.48, 0, -14),
    ]]
    fillet(fillet5_edges, radius=FILLET5_R)


solid = part.part
